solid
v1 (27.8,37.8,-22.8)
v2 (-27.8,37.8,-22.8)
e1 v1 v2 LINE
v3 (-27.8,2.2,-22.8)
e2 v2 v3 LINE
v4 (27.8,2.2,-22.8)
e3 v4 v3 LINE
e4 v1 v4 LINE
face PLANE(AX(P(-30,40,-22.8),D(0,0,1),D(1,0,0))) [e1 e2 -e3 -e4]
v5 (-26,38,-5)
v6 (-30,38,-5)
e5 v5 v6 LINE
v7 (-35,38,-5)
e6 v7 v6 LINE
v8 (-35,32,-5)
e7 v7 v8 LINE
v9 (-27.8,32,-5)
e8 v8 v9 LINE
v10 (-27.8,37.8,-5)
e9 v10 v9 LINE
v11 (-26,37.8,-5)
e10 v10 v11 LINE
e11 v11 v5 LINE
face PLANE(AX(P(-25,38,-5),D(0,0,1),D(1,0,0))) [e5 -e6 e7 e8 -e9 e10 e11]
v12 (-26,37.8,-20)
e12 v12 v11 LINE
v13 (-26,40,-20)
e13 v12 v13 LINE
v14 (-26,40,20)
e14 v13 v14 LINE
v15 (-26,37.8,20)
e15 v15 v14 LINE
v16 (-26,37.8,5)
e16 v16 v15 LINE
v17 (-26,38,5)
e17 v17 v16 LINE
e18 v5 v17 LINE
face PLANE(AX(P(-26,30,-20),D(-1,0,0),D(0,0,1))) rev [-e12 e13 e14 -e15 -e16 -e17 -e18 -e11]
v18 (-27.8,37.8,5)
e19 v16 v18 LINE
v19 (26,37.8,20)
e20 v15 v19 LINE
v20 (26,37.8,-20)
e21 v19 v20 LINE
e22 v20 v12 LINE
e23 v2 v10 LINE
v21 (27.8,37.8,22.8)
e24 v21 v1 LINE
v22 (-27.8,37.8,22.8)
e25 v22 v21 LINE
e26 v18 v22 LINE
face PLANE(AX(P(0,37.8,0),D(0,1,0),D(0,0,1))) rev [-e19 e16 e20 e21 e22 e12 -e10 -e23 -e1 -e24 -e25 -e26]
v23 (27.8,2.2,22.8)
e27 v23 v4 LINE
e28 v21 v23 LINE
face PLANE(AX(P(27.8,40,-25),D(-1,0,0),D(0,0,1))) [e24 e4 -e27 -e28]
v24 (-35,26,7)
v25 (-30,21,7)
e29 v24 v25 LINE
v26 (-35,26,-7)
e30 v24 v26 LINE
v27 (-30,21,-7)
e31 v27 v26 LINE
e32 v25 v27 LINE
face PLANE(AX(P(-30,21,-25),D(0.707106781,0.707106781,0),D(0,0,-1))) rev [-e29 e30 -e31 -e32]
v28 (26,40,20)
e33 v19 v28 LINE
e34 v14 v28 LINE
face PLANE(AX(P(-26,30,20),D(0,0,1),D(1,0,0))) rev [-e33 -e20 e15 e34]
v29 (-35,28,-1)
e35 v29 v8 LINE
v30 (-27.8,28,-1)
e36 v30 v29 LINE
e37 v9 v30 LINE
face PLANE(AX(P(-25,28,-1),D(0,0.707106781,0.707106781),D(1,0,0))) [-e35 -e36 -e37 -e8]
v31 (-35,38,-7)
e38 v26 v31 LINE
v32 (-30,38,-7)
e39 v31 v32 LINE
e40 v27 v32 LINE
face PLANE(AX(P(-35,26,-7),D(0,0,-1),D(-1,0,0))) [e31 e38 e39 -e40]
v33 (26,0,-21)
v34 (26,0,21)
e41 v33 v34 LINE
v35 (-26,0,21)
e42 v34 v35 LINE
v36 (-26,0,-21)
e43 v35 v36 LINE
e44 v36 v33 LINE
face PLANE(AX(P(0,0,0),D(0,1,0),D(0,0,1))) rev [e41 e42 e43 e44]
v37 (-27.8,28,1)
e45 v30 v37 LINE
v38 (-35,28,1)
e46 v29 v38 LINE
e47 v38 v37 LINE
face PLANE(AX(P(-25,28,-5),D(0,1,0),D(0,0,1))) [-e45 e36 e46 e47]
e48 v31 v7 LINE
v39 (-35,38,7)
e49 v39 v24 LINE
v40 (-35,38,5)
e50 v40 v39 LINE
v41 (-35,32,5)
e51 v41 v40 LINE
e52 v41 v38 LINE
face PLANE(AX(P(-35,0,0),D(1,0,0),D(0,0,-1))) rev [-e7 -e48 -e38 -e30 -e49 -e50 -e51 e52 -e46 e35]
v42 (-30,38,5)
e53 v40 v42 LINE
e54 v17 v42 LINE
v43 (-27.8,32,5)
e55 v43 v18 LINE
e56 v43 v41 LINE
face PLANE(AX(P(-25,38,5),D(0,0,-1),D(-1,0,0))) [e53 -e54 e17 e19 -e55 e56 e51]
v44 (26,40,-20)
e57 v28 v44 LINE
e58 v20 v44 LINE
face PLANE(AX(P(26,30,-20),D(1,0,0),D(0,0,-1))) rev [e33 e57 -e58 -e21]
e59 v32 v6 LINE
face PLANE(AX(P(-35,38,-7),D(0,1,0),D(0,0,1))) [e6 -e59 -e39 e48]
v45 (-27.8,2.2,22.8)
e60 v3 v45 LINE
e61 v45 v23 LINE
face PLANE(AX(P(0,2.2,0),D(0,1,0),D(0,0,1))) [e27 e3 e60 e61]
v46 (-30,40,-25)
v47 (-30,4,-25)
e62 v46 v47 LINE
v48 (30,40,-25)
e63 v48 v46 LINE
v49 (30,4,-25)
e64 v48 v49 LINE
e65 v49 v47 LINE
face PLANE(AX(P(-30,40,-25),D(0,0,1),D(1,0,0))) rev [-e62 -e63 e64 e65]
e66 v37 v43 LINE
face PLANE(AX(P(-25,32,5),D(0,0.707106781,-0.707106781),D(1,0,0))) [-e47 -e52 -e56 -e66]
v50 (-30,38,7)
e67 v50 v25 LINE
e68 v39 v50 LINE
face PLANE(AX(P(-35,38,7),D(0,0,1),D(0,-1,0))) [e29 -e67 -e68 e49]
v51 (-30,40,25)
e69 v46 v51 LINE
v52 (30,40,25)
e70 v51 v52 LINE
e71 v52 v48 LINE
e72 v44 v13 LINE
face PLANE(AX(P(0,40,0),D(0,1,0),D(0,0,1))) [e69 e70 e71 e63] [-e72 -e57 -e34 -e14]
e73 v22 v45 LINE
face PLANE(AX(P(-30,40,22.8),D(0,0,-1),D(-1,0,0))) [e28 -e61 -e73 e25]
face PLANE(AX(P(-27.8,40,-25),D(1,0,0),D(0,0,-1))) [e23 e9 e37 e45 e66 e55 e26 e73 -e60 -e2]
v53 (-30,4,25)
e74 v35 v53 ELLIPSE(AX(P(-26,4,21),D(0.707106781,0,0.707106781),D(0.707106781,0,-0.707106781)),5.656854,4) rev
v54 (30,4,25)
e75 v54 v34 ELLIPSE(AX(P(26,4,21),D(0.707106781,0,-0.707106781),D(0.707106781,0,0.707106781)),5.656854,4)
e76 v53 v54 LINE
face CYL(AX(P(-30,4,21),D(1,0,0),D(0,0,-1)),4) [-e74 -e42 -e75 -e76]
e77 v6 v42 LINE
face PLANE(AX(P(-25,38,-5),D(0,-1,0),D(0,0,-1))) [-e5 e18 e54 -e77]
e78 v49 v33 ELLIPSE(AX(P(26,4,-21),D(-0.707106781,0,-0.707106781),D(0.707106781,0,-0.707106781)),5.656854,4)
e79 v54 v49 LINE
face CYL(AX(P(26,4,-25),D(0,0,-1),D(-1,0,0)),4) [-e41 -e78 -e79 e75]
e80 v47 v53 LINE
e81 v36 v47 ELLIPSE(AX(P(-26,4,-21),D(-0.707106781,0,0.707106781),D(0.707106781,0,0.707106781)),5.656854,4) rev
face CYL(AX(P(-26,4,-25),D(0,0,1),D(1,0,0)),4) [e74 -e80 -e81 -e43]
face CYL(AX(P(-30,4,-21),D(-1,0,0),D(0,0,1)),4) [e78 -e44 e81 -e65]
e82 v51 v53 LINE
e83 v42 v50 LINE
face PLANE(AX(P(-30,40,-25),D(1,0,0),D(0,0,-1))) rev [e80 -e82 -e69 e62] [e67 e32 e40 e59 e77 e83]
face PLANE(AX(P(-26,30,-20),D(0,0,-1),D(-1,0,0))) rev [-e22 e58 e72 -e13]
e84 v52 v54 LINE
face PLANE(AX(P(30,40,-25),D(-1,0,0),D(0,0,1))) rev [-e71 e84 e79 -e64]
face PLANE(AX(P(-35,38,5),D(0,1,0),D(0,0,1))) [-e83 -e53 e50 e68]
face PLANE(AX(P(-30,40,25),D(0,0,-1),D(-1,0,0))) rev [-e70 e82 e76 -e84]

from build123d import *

# Parameters (mm, degrees)
SKETCH1_W           = 60
SKETCH1_H           = 50
BOSS_EXTRUDE1_DEPTH = 40
SHELL1_T            = 2.2
SKETCH2_W           = 52
SKETCH2_H           = 40
CUT_EXTRUDE1_DEPTH  = 10
SKETCH3_W           = 10
SKETCH3_H           = 10
CUT_EXTRUDE2_DEPTH  = 5
BOSS_EXTRUDE2_DEPTH = 5
CHAMFER3_SIZE       = 5
CHAMFER4_SIZE       = 4
FILLET1_R           = 4


with BuildPart() as part:
    # Sketch1 → Boss-Extrude1 (new body)
    with BuildSketch(Plane(origin=(0, 0, 0), x_dir=(1, 0, 0), z_dir=(0, 1, 0))):
        Rectangle(SKETCH1_W, SKETCH1_H)
    extrude(amount=BOSS_EXTRUDE1_DEPTH)

    # Shell1 (no face opened: a closed hollow body)
    add(offset(amount=-SHELL1_T, mode=Mode.PRIVATE), mode=Mode.SUBTRACT)

    # Sketch2 → Cut-Extrude1 (cut)
    with BuildSketch(Plane(origin=(0, 40, 0), x_dir=(1, 0, 0), z_dir=(0, 1, 0))):
        Rectangle(SKETCH2_W, SKETCH2_H)
    extrude(amount=-CUT_EXTRUDE1_DEPTH, mode=Mode.SUBTRACT)

    # Sketch3 → Cut-Extrude2 (cut)
    with BuildSketch(Plane(origin=(-30, 0, 0), x_dir=(0, 0, -1), z_dir=(1, 0, 0))):
        with Locations((0, 33)):
            Rectangle(SKETCH3_W, SKETCH3_H)
    extrude(amount=CUT_EXTRUDE2_DEPTH, mode=Mode.SUBTRACT)

    # Sketch4 → Boss-Extrude2 (add)
    with BuildSketch(Plane(origin=(-30, 0, 0), x_dir=(0, 0, -1), z_dir=(1, 0, 0))):
        Polygon((-5, 38), (-7, 38), (-7, 26), (7, 26), (7, 38), (5, 38), (5, 28), (-5, 28), align=None)
    extrude(amount=-BOSS_EXTRUDE2_DEPTH)

    # Chamfer3
    chamfer3_edges = [part.edges().sort_by_distance(p)[0] for p in [
        (-30, 26, 0),
    ]]
    chamfer(chamfer3_edges, length=CHAMFER3_SIZE - 0.0001)  # a hair under: the kernel refuses the full size

    # Chamfer4
    chamfer4_edges = [part.edges().sort_by_distance(p)[0] for p in [
        (-31.4, 28, 5),
        (-31.4, 28, -5),
    ]]
    chamfer(chamfer4_edges, length=CHAMFER4_SIZE)

    # Fillet1
    fillet1_edges = [part.edges().sort_by_distance(p)[0] for p in [
        (0, 0, 25),
        (-30, 0, 0),
        (0, 0, -25),
        (30, 0, 0),
    ]]
    fillet(fillet1_edges, radius=FILLET1_R)


solid = part.part
